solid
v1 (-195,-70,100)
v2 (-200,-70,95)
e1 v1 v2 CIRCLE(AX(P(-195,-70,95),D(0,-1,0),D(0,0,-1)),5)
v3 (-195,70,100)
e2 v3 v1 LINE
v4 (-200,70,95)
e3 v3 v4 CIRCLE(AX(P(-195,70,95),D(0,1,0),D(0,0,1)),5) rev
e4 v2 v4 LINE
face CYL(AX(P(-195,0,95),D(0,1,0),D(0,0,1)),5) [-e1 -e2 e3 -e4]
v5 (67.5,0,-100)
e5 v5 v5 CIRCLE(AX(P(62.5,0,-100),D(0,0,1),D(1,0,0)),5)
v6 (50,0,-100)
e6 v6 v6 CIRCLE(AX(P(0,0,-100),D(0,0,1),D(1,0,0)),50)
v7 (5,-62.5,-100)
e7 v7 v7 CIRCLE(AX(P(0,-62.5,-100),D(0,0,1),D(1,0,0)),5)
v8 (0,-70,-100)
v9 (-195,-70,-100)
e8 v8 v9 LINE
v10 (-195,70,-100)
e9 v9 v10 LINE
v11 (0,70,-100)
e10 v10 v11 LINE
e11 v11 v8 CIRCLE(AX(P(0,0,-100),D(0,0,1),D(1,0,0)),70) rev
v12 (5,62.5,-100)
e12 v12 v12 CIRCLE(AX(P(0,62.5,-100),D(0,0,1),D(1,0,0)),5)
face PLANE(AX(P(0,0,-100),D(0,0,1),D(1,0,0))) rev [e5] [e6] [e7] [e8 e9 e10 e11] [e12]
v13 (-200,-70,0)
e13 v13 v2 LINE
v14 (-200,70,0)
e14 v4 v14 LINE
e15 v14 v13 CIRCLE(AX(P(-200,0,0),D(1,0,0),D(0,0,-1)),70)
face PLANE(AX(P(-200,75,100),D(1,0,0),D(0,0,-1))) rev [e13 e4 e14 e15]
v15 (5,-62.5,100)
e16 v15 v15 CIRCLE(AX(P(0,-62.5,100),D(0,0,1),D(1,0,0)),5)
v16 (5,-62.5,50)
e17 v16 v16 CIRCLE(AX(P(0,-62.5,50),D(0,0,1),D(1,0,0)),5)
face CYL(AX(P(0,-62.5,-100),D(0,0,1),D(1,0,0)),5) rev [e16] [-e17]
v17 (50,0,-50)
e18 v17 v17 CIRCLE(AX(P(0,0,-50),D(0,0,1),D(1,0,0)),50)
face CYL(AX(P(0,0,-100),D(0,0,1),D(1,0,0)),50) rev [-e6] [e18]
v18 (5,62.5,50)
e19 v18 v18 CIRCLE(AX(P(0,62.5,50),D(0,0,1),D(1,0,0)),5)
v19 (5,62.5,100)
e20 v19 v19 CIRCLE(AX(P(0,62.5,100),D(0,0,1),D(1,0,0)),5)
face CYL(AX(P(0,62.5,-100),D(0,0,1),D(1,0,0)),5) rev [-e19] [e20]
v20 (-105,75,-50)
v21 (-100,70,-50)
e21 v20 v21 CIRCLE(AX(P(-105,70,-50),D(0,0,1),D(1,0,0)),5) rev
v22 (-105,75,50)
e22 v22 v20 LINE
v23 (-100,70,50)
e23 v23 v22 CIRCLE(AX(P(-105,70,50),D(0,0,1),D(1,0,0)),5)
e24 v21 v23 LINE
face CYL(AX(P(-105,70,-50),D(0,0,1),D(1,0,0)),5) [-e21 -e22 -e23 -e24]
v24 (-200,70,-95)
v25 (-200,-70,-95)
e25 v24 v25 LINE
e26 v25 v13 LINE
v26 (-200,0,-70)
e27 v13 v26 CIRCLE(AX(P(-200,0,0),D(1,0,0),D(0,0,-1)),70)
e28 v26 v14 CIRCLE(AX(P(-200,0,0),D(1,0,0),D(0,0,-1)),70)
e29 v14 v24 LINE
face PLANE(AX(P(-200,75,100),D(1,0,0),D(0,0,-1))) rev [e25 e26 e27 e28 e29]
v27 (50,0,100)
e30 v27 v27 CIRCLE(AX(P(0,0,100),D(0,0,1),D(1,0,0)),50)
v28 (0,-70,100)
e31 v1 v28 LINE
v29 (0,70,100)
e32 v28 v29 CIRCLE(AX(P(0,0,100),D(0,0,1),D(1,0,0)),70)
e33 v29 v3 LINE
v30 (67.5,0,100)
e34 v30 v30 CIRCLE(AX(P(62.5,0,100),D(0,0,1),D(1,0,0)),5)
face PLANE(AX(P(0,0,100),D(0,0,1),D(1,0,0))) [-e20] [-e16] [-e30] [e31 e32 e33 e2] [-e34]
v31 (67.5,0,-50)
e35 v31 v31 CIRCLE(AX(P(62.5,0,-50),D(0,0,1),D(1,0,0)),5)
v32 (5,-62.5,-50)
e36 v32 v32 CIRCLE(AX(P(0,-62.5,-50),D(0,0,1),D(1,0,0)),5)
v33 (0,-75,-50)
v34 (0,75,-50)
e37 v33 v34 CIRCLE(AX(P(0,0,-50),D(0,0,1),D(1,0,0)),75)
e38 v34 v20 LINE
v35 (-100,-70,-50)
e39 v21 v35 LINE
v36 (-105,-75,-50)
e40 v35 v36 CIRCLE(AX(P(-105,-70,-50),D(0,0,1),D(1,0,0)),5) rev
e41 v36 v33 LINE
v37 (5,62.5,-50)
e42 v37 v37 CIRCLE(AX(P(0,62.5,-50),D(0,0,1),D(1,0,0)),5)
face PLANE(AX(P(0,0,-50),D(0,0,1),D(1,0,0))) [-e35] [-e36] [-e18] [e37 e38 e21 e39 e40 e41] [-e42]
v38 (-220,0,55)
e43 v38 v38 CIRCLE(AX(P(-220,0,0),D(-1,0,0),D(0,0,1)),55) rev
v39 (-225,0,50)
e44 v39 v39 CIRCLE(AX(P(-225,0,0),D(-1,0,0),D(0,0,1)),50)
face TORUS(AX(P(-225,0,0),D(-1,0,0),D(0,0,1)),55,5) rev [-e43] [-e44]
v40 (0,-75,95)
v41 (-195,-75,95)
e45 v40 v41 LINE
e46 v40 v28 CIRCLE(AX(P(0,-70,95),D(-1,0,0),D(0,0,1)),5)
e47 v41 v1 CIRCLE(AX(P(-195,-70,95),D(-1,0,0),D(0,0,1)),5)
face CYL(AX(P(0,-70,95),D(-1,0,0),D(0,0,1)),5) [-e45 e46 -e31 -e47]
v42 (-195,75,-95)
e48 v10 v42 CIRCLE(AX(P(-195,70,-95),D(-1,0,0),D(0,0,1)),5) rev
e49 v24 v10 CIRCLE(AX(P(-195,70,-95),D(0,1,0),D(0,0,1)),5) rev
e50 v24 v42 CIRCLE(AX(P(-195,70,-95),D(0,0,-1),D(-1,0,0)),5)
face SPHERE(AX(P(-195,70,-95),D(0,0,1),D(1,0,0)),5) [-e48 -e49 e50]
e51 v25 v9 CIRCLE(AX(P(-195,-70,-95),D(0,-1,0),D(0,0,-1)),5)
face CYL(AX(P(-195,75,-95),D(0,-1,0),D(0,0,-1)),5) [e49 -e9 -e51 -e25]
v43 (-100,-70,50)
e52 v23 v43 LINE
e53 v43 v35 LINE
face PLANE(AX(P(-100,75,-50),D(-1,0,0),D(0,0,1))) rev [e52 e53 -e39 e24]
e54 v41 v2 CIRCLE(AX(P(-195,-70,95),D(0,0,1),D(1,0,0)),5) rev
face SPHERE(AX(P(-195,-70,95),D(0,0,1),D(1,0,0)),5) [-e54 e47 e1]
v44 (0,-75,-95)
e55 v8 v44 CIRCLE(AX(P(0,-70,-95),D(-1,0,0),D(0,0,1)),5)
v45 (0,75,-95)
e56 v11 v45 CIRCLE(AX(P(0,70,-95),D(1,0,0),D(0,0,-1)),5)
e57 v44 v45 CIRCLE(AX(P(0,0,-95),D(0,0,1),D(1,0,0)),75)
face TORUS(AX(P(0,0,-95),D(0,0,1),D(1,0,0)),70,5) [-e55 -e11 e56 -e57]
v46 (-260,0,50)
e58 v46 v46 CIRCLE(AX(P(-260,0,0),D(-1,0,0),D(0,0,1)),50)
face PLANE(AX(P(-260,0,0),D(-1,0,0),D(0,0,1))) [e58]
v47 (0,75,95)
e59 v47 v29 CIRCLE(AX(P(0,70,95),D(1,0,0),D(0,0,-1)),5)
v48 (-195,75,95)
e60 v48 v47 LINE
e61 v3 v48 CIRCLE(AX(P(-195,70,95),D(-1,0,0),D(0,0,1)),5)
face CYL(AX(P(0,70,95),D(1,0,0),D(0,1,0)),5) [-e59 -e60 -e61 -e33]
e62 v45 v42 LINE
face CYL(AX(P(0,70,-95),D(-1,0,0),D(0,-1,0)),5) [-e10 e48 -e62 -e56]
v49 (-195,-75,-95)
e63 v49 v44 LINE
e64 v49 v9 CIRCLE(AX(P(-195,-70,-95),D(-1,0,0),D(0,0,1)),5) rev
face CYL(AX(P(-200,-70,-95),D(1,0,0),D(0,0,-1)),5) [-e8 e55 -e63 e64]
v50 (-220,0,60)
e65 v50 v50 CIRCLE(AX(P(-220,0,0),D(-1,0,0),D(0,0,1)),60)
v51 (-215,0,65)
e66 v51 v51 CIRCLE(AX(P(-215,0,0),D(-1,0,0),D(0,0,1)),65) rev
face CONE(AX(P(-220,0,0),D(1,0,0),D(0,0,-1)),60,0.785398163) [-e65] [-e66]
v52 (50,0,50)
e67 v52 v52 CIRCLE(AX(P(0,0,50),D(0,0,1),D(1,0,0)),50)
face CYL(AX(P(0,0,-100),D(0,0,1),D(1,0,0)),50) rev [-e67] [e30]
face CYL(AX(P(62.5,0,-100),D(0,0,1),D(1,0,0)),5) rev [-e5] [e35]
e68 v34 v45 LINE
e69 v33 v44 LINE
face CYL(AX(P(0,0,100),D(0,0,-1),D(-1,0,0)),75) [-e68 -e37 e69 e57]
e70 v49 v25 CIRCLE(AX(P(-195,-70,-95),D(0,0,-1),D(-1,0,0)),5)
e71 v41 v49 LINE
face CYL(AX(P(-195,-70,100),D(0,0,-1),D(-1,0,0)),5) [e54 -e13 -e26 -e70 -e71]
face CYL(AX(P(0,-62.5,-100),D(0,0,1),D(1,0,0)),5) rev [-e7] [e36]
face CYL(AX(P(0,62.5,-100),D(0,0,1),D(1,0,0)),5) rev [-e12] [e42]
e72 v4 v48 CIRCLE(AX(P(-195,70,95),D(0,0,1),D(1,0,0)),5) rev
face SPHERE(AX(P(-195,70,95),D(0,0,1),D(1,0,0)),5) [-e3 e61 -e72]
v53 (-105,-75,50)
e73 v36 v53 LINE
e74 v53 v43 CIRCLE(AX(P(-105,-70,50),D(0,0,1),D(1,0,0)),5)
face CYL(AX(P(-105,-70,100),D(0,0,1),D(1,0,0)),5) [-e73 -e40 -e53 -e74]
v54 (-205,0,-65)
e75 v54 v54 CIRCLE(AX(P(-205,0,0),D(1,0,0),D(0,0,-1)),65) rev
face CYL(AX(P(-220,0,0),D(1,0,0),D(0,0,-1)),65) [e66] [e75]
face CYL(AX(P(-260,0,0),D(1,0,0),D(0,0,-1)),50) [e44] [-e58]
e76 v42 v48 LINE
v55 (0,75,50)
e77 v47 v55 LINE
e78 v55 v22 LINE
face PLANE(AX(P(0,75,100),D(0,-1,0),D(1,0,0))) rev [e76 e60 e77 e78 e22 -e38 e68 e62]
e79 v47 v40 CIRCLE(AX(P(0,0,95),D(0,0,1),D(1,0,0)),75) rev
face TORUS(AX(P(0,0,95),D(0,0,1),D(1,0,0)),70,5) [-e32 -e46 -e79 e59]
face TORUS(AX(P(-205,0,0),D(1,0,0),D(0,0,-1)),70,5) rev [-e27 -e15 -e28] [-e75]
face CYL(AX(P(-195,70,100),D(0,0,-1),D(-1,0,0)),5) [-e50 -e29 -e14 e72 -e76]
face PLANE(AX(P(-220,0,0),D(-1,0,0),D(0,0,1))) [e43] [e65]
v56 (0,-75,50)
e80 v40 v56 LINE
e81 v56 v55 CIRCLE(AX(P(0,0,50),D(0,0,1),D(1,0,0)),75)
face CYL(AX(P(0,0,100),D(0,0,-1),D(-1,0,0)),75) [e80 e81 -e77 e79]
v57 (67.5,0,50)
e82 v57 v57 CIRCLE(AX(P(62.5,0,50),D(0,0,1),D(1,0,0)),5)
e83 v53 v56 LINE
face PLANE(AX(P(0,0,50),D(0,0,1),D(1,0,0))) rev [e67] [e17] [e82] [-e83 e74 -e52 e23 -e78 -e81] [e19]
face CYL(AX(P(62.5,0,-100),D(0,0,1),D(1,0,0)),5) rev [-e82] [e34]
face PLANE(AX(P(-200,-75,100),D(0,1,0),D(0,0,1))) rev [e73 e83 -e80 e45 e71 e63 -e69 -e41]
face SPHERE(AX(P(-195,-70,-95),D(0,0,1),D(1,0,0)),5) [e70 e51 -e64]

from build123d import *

# Parameters (mm, degrees)
BOSS_EXTRUDE1_DEPTH = 100
CUT_EXTRUDE1_DEPTH  = 50
SKETCH3_R           = 65
BOSS_EXTRUDE2_DEPTH = 20
SKETCH4_R           = 50
BOSS_EXTRUDE3_DEPTH = 40
CHAMFER1_SIZE       = 5
SKETCH5_R           = 5
CUT_EXTRUDE2_DEPTH  = 337.489227168
FILLET1_R           = 5
SKETCH6_R           = 50
CUT_EXTRUDE3_DEPTH  = 337.489227168


with BuildPart() as part:
    # Sketch1 → Boss-Extrude1 (new, symmetric)
    with BuildSketch(Plane.XY):
        with BuildLine():
            Line((0, 75), (-200, 75))
            Line((-200, 75), (-200, -75))
            Line((-200, -75), (0, -75))
            ThreePointArc((0, -75), (75, 0), (0, 75))
        make_face()
    extrude(amount=BOSS_EXTRUDE1_DEPTH, both=True)

    # Sketch2 → Cut-Extrude1 (cut, symmetric)
    with BuildSketch(Plane.XY):
        with BuildLine():
            Line((0, 75), (-100, 75))
            Line((-100, 75), (-100, -75))
            Line((-100, -75), (0, -75))
            ThreePointArc((0, -75), (75, 0), (0, 75))
        make_face()
    extrude(amount=CUT_EXTRUDE1_DEPTH, both=True, mode=Mode.SUBTRACT)

    # Sketch3 → Boss-Extrude2 (add)
    with BuildSketch(Plane.ZY.offset(200)):
        with Locations(Location((0, 0, 0), (0, 0, 180))):
            Circle(SKETCH3_R)
    extrude(amount=BOSS_EXTRUDE2_DEPTH)

    # Sketch4 → Boss-Extrude3 (add)
    with BuildSketch(Plane.ZY.offset(220)):
        Circle(SKETCH4_R)
    extrude(amount=BOSS_EXTRUDE3_DEPTH)

    # Chamfer1
    chamfer1_edges = [part.edges().sort_by_distance(p)[0] for p in [
        (-220, 0, 65),
    ]]
    chamfer(chamfer1_edges, length=CHAMFER1_SIZE)

    # Sketch5 → Cut-Extrude2 (cut, through all)
    with BuildSketch(Plane.XY.offset(100)):
        with Locations((0, 62.5)):
            Circle(SKETCH5_R)
        with Locations((62.5, 0)):
            Circle(SKETCH5_R)
        with Locations((0, -62.5)):
            Circle(SKETCH5_R)
    extrude(amount=-CUT_EXTRUDE2_DEPTH, mode=Mode.SUBTRACT)

    # Fillet1
    fillet1_edges = [part.edges().sort_by_distance(p)[0] for p in [
        (-200, 0, 100),
        (-100, -75, 100),
        (-100, -75, 0),
        (-100, 75, 0),
        (-200, 0, 65),
        (-220, 0, -50),
        (75, 0, 100),
        (-100, -75, -100),
        (-200, 0, -100),
        (-100, 75, -100),
        (75, 0, -100),
        (-100, 75, 100),
        (-200, -75, 0),
        (-200, 75, 0),
    ]]
    fillet(fillet1_edges, radius=FILLET1_R - 0.0001)  # a hair under: the kernel refuses the full size

    # Sketch6 → Cut-Extrude3 (cut, through all)
    with BuildSketch(Plane.XY.offset(100)):
        Circle(SKETCH6_R)
    extrude(amount=-CUT_EXTRUDE3_DEPTH, mode=Mode.SUBTRACT)


solid = part.part
